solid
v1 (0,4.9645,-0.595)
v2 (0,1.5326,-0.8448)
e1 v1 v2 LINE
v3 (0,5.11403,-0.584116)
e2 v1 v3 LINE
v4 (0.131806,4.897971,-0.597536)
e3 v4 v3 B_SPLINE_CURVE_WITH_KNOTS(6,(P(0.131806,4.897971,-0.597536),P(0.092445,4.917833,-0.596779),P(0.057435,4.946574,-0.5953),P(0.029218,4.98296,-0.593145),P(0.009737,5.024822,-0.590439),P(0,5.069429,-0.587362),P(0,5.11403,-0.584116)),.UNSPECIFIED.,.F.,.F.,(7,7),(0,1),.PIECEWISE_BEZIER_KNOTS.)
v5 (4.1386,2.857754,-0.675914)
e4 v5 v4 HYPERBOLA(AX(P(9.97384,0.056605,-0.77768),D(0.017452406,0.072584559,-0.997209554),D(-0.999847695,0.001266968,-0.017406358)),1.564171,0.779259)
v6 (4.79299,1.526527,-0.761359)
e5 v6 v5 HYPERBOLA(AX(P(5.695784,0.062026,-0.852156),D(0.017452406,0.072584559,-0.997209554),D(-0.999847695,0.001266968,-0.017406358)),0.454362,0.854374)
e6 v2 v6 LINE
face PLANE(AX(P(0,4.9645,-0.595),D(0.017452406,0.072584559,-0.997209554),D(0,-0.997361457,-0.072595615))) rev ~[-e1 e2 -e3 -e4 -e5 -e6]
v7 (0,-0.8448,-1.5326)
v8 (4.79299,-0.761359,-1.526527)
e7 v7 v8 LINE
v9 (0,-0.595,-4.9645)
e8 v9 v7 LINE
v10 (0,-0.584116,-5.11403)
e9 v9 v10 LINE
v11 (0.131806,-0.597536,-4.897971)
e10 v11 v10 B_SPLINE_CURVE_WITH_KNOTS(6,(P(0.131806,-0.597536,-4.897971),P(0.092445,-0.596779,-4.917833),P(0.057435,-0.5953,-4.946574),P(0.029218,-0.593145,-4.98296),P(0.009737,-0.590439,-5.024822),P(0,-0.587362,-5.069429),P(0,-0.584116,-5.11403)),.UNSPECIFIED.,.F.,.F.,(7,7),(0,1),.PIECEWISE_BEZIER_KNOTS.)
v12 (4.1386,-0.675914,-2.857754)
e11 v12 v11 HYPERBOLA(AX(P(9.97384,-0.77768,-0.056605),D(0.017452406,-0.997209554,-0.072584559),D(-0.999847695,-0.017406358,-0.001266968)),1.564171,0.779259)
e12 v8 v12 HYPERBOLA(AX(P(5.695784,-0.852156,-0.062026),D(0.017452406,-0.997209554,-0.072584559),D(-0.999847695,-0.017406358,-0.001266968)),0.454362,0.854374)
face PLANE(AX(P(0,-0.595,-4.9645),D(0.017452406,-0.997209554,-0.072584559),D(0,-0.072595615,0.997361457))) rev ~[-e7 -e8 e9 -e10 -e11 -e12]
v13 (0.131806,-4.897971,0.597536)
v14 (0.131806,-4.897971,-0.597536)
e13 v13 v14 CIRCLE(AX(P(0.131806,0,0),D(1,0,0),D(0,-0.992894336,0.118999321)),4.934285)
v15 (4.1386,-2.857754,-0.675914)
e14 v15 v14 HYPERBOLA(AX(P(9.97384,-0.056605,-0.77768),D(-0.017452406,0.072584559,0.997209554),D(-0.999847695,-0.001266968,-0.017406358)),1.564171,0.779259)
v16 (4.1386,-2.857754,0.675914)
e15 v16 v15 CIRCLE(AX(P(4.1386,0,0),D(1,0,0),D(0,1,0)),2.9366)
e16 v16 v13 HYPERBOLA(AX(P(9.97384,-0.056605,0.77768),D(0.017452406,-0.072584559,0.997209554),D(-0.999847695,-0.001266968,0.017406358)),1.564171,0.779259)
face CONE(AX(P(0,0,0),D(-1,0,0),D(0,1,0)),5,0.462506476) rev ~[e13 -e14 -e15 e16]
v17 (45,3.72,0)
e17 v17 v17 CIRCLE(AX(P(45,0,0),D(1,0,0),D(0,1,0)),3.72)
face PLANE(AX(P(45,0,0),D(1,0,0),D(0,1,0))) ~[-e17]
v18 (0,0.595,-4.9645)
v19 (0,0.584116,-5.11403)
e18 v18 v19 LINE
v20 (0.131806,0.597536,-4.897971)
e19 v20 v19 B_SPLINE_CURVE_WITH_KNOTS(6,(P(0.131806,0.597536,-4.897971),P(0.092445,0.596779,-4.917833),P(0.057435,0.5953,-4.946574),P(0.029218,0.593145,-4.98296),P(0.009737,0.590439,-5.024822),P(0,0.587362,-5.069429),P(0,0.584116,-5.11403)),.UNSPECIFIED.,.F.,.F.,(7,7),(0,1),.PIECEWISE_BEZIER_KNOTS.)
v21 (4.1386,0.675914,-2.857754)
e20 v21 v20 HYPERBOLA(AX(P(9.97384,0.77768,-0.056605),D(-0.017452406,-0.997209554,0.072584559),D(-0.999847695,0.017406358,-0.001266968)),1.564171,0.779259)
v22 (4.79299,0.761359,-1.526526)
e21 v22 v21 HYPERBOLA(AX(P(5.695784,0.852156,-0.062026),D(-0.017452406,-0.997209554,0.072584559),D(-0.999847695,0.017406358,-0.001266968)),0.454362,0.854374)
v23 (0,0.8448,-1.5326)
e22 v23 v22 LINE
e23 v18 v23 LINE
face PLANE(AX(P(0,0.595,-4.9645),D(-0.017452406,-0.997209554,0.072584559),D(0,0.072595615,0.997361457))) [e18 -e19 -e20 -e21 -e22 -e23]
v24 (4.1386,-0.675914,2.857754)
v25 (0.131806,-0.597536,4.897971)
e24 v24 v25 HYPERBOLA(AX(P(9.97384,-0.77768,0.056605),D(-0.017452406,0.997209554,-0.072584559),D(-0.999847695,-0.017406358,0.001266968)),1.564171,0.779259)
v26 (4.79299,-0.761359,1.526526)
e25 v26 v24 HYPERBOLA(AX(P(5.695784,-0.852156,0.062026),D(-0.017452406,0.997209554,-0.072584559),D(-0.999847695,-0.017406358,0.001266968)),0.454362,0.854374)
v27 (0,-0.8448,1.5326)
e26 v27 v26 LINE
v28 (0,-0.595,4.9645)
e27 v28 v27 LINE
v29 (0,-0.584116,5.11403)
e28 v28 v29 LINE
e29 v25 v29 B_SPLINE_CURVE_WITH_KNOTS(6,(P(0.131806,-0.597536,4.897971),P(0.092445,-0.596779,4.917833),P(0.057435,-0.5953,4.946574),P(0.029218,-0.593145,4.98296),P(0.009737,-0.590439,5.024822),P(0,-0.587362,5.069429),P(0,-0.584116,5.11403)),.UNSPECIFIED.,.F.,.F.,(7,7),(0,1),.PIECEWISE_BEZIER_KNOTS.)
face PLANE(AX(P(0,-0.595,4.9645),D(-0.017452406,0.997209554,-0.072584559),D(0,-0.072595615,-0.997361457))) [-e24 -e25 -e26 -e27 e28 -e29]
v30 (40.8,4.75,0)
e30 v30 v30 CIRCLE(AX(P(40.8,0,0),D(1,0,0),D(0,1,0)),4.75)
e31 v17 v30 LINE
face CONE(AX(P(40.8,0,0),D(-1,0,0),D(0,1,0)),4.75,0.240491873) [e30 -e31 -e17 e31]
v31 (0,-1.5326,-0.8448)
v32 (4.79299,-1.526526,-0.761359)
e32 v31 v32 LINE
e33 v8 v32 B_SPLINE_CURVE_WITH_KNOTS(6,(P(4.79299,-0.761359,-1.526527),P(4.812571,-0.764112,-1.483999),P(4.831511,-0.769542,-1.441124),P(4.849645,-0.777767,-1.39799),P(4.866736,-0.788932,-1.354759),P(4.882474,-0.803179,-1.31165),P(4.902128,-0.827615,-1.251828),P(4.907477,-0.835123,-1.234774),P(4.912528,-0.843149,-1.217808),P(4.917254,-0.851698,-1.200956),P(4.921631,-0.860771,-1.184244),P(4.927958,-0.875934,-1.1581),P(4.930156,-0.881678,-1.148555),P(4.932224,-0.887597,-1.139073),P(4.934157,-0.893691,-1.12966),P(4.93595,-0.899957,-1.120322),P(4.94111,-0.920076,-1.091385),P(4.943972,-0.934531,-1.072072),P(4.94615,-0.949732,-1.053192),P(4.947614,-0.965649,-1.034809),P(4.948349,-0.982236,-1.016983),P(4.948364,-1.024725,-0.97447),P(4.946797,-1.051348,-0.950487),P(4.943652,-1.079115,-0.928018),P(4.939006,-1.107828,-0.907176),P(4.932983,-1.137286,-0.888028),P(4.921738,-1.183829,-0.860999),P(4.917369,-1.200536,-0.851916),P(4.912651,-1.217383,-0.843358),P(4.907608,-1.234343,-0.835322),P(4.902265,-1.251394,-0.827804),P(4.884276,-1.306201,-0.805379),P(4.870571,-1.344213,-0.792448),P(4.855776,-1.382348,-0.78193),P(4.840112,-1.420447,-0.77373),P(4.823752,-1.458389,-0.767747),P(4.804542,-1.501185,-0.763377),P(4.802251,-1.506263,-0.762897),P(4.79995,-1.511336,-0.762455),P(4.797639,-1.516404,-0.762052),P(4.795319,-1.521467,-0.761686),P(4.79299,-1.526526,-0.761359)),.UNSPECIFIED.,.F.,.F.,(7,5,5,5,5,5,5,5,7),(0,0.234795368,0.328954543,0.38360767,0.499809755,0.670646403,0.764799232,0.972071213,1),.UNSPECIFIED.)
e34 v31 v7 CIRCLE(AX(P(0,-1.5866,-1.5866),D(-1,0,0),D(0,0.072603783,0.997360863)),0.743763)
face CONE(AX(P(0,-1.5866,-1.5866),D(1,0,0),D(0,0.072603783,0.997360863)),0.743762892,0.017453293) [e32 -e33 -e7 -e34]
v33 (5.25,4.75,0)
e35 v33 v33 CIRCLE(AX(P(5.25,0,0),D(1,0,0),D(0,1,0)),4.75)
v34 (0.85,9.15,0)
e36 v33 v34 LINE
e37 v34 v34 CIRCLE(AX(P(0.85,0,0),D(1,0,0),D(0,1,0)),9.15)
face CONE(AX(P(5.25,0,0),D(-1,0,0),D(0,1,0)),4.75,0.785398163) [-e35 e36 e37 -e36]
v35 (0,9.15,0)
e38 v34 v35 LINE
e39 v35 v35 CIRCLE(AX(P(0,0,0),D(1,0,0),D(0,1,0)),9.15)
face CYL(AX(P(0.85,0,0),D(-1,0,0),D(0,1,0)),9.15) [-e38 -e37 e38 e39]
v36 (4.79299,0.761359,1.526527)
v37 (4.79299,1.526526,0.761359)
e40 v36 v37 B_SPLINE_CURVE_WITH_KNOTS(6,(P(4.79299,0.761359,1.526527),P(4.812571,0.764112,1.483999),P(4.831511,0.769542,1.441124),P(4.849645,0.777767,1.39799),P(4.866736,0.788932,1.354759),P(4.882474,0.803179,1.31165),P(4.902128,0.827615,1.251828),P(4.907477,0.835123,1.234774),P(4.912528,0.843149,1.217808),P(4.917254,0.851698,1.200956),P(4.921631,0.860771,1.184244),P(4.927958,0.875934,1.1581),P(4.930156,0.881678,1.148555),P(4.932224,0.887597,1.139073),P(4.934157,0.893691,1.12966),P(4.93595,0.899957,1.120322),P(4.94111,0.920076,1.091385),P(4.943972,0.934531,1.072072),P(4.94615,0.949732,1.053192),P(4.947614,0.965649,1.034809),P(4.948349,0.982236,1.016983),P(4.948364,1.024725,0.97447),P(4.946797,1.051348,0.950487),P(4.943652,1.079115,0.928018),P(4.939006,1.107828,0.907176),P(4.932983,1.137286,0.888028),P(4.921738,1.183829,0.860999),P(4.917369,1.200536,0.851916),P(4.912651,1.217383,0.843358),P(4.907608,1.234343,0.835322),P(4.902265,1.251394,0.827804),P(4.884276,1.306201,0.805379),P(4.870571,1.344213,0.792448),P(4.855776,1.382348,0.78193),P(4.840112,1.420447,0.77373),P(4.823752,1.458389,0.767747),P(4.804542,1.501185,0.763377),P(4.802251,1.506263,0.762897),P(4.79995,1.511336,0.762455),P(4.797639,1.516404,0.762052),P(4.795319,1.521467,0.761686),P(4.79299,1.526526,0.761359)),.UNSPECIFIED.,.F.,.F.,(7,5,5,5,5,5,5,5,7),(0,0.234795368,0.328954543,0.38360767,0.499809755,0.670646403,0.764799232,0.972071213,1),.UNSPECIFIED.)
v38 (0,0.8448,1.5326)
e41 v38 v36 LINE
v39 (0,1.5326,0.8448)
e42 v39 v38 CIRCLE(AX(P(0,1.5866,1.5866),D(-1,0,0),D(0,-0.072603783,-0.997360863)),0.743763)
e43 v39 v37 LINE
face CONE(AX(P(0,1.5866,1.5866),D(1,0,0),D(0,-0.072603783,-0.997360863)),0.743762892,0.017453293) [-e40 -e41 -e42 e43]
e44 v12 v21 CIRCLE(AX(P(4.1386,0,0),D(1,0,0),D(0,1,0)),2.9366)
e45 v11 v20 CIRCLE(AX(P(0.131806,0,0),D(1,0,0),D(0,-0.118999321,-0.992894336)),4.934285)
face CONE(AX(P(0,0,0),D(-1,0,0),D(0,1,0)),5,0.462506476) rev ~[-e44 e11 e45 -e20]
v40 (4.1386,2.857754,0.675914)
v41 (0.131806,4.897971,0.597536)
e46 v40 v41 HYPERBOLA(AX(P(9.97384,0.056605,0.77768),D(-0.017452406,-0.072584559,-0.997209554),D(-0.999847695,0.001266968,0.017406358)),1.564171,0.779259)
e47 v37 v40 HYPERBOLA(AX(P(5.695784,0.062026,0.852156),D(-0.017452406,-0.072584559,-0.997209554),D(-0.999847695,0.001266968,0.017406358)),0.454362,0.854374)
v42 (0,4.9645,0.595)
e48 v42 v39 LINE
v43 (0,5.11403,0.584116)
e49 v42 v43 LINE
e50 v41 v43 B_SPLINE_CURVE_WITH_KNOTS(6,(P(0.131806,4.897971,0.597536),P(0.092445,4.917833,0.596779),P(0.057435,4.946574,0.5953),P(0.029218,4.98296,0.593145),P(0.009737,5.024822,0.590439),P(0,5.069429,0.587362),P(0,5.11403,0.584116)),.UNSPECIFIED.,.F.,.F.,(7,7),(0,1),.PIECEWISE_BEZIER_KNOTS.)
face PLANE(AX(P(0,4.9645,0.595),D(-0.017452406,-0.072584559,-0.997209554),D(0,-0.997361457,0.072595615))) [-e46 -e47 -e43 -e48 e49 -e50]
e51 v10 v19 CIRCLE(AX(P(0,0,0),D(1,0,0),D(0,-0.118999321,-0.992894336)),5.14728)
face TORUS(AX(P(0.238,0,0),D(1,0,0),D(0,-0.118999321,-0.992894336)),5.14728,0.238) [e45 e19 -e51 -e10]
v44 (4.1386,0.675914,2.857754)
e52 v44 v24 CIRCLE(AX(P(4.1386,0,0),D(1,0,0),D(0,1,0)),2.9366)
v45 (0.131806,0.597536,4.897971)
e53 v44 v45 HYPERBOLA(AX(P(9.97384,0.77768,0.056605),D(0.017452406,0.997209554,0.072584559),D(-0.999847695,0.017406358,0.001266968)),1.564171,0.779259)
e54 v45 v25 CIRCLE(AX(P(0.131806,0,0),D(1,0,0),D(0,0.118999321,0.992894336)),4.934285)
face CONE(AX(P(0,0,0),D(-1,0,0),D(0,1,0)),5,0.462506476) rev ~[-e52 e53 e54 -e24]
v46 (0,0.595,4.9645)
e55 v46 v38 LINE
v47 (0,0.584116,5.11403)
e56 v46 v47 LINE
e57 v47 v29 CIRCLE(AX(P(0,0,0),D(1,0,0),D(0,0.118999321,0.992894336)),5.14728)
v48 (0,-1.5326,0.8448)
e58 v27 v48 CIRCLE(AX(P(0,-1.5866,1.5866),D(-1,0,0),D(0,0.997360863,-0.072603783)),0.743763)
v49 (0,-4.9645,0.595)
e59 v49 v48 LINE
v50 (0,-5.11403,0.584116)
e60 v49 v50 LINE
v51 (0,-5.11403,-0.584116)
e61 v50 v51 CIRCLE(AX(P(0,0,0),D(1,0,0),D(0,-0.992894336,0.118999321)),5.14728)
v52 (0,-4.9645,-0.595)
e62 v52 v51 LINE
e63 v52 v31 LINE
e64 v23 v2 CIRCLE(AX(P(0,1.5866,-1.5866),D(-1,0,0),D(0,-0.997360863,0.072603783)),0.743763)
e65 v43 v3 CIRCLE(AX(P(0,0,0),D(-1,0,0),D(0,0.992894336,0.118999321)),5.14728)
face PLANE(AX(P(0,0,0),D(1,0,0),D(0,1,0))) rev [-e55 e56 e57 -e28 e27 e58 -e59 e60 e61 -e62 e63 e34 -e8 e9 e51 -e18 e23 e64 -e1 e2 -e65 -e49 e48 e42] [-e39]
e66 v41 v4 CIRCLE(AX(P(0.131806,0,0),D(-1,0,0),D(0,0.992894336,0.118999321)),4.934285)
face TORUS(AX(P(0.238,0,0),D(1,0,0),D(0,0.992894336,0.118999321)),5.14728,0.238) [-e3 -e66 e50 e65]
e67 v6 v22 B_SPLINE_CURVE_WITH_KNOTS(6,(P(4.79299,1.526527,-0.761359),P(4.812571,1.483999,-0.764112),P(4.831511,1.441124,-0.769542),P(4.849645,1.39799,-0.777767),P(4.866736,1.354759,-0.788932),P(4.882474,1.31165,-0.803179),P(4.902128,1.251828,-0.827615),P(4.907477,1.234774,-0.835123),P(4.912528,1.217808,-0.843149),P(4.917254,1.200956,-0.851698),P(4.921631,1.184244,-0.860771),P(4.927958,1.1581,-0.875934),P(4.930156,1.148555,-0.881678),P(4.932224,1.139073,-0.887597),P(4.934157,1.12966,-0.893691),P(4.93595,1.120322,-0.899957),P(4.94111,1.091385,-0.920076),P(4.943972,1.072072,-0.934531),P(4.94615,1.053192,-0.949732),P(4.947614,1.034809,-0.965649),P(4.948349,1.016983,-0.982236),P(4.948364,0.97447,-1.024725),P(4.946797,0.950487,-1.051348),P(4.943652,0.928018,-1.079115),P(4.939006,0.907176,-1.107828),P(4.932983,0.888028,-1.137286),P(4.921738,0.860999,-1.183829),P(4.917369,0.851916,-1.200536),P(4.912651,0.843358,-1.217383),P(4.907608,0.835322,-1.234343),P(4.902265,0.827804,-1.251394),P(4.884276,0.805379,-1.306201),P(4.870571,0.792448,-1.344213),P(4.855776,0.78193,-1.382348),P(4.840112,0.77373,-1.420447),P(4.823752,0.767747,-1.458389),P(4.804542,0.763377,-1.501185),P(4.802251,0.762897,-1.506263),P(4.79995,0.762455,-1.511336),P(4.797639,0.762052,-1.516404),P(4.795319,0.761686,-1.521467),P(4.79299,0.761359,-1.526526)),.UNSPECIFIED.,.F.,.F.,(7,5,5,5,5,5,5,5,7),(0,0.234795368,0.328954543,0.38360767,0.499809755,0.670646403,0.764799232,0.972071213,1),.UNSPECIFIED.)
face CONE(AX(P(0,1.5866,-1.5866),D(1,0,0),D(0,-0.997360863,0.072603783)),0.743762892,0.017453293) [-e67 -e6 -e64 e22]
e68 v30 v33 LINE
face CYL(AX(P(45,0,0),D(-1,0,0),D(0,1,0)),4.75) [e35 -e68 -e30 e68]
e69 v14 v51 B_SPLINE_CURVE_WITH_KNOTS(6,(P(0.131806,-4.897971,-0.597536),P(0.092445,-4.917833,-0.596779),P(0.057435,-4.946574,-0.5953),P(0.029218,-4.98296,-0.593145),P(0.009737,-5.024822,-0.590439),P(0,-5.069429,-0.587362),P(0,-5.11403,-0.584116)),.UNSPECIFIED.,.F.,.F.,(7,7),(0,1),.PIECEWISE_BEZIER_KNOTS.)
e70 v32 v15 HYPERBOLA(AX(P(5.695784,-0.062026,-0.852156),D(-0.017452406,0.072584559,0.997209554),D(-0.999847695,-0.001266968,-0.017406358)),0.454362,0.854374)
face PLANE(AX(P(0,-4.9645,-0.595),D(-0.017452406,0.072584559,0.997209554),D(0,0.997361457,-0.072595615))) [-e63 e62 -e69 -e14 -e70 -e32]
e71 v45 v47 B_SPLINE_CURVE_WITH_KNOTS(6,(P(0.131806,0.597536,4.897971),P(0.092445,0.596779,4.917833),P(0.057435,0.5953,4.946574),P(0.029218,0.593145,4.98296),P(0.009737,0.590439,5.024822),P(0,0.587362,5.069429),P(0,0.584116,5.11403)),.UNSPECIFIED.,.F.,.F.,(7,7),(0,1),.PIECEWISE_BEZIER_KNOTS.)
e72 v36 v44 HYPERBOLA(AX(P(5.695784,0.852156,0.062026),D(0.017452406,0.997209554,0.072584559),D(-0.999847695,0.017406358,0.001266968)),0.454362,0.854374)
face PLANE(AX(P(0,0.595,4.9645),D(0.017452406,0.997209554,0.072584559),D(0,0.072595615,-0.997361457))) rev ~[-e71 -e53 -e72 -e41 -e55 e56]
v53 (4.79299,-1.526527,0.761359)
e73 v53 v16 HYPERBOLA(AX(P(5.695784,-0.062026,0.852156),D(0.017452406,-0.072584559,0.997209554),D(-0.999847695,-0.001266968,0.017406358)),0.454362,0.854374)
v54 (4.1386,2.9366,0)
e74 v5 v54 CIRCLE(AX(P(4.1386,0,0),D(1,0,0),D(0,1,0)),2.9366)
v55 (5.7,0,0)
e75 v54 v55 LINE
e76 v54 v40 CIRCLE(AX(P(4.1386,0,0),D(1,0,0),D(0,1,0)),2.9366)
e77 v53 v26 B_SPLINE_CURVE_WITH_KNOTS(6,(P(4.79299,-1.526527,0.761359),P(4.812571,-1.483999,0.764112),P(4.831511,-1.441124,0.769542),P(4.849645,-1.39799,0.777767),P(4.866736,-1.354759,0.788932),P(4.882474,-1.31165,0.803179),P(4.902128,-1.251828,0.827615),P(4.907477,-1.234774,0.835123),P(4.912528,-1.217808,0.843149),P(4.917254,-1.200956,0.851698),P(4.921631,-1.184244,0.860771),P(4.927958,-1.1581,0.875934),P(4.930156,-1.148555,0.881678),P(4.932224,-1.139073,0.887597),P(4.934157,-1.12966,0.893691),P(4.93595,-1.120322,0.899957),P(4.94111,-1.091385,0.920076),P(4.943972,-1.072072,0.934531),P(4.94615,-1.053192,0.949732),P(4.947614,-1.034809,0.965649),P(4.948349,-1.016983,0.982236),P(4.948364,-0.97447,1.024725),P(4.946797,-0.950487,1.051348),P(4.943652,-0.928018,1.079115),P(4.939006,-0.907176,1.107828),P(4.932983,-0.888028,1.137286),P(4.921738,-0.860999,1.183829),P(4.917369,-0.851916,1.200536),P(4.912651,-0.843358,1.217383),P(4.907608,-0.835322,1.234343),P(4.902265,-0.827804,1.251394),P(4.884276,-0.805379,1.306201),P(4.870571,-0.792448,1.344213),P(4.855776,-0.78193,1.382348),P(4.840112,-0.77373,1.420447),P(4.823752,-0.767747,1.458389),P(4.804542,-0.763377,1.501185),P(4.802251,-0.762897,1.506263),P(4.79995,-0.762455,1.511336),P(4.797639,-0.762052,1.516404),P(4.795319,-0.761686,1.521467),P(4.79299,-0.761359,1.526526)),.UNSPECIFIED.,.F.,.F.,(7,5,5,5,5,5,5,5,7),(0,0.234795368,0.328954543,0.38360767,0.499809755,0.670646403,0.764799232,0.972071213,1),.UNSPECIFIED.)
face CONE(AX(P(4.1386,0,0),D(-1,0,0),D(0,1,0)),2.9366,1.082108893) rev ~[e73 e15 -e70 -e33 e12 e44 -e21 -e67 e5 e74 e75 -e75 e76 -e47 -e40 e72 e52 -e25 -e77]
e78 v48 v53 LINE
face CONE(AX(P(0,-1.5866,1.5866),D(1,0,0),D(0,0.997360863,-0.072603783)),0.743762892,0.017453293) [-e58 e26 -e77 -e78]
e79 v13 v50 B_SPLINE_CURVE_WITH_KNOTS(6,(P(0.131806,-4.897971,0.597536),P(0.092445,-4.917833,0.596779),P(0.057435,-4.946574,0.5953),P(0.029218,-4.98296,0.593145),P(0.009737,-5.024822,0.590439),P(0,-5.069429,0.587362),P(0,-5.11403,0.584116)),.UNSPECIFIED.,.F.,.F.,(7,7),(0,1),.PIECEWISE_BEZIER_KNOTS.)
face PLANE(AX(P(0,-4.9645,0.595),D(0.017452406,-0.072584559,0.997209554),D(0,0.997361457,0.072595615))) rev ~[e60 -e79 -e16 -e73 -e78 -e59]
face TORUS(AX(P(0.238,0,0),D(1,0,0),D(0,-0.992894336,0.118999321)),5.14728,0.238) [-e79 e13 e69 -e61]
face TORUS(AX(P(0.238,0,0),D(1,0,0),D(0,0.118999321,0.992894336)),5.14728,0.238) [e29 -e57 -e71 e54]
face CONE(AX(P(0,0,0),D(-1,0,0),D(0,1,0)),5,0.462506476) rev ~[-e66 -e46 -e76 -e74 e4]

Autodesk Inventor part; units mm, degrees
ref_plane "YZ Plane" through (0, 0, 0) normal (1, 0, 0) x (0, 1, 0)
ref_plane "XZ Plane" through (0, 0, 0) normal (0, 1, 0) x (-1, 0, 0)
sketch "Sketch1" plane through (0, 0, 0) normal (0, 0, 1) x (1, 0, 0)
  line L0 (5.7, 0) -> (45, 0)
  line L1 (45, 0) -> (45, 4.75)
  line L2 (45, 4.75) -> (5.25, 4.75)
  line L3 (0.85, 9.15) -> (0, 9.15)
  line L4 (-9, 0) -> (54, 0) projected
  line L5 (0, -1.83) -> (0, 10.98) projected
  line L6 (0, 5) -> (4.1386, 2.9366)
  line L7 (4.1386, 2.9366) -> (5.7, 0)
  line L8 (5.25, 4.75) -> (0.85, 9.15)
  line L9 (0, 9.15) -> (0, 5)
  dimension "d2" = 9.5
  dimension "d3" = 18.3
  dimension "d4" = 5.7
  dimension "d5" = 10
  dimension "d6" = 26.5
  dimension "d7" = 62
  dimension "d13" = 45
  dimension "d14" = 5.25
  dimension "d15" = 45
revolve "Body" add sketch "Sketch1" angle 360 about axis through (5.7, 0, 0) along (1, 0, 0) contours L7 L6 L5 L3 L8 L2 L1 L0
sketch "Sketch2" plane through (0, 0, 0) normal (-1, 0, 0) x (0, 0, 1)
  line L0 (0, -12.81) -> (0, 12.81) projected
  line L1 (-12.81, 0) -> (12.81, 0) projected
  line L2 (0, 5) -> (0, 0) construction
  line L3 (0, 0) -> (5, 0) construction
  arc A0 (1.5, 0) -> (0, 1.5) centre (0, 0) ccw construction
  line L4 (0, 0) -> (6.47, 6.47) construction
  arc A1 (1.75, 0) -> (0, 1.75) centre (0, 0) ccw construction
  line L5 (0.595, 4.9645) -> (0.8448, 1.5326)
  line L6 (4.9645, 0.595) -> (1.5326, 0.8448)
  arc A2 (0.8448, 1.5326) -> (1.5326, 0.8448) centre (1.5866, 1.5866) ccw
  arc A3 (5, 0) -> (4.9645, 0.595) centre (0, 0) ccw
  arc A4 (0.595, 4.9645) -> (0, 5) centre (0, 0) ccw
  arc A5 (4.9645, 0.595) -> (0.595, 4.9645) centre (0, 0) ccw
  line L7 (0.595, -4.9645) -> (0.8448, -1.5326)
  line L8 (4.9645, -0.595) -> (1.5326, -0.8448)
  arc A6 (1.5326, -0.8448) -> (0.8448, -1.5326) centre (1.5866, -1.5866) ccw
  arc A7 (4.9645, -0.595) -> (5, 0) centre (0, 0) ccw
  arc A8 (0, -5) -> (0.595, -4.9645) centre (0, 0) ccw
  arc A9 (0.595, -4.9645) -> (4.9645, -0.595) centre (0, 0) ccw
  line L9 (-0.595, 4.9645) -> (-0.8448, 1.5326)
  line L10 (-4.9645, 0.595) -> (-1.5326, 0.8448)
  arc A10 (-1.5326, 0.8448) -> (-0.8448, 1.5326) centre (-1.5866, 1.5866) ccw
  arc A11 (-4.9645, 0.595) -> (-5, 0) centre (0, 0) ccw
  arc A12 (0, 5) -> (-0.595, 4.9645) centre (0, 0) ccw
  arc A13 (-0.595, 4.9645) -> (-4.9645, 0.595) centre (0, 0) ccw
  arc A14 (-4.9645, -0.595) -> (-0.595, -4.9645) centre (0, 0) ccw
  arc A15 (-0.595, -4.9645) -> (0, -5) centre (0, 0) ccw
  arc A16 (-5, 0) -> (-4.9645, -0.595) centre (0, 0) ccw
  line L11 (-4.9645, -0.595) -> (-1.5326, -0.8448)
  arc A17 (-0.8448, -1.5326) -> (-1.5326, -0.8448) centre (-1.5866, -1.5866) ccw
  line L12 (-0.595, -4.9645) -> (-0.8448, -1.5326)
  circle A18 centre (0, 0) radius 9.15 projected
  circle A19 centre (0, 0) radius 5 projected
  dimension "d18" = 45
  dimension "d19" = 3
  dimension "d20" = 3.5
  dimension "d21" = 10
  dimension "d22" = 0.595
extrude "Slot" add sketch "Sketch2" against normal up to next draft 1 contours L7 A6 L8 A9 | A14 L11 A17 L12 | A13 L9 A10 L10 | L6 A2 L5 A5
fillet "Fillet1" radius 0.238 4 edges at (0, 5, 0) (0, 0, 5) (0, -5, 0) (0, 0, -5)
thread "Thread" size "9.5x2.1" class "6g" standard "Metric Forming Screw Threads" length 39.75
chamfer "Chamfer1" distance 1.03 distance2 4.2 1 edges at (45, -4.75, 0) measured on face at (45, -1.1851, 1.0499)
ref_plane "Work Plane2" through (2.8, 0, 0) normal (0, 1, 0) x (1, 0, 0)
equation "\"d2\" = NND"
equation "\"d3\" = KOD"
equation "\"d4\" = STI"
equation "\"d5\" = SDM"
equation "\"d13\" = 0.5 * SEWI"
equation "\"d14\" = KOH"
equation "\"d15\" = NLG"
equation "\"d19\" = 0.3 * SDM"
equation "\"d20\" = 0.35 * SDM"
equation "\"d21\" = SDM"
equation "\"d22\" = 0.5 * SBR"
equation "\"d45\" = STI"
equation "\"d25\" = 0.2 * SBR"
equation "\"d9\" = GEL"
equation "\"d11\" = -0.5 * GD2 + 0.5 * NND"
equation "\"d12\" = SPTZ"
equation "\"NND\" = 9.5"
equation "\"NLG\" = 45"
equation "\"GEL\" = 39.75"
equation "\"KOD\" = 18.3"
equation "\"KOH\" = 5.25"
equation "\"SDM\" = 10"
equation "\"STI\" = 5.7"
equation "\"SBR\" = 1.19"
equation "\"SPTZ\" = 4.2"
equation "\"GD2\" = 7.44"
equation "\"SEWI\" = 90deg"
equation "\"d0\" = NLG"
equation "\"d1\" = KOH"
equation "\"THREADDIA\" = 9.5"
equation "\"TOA\" = 30deg"
equation "\"PTC\" = 2.1"
equation "\"GD1\" = 7.85"
properties part number "ISO 7050 - ST 9.5 x 45 - F - H" material "Steel"
